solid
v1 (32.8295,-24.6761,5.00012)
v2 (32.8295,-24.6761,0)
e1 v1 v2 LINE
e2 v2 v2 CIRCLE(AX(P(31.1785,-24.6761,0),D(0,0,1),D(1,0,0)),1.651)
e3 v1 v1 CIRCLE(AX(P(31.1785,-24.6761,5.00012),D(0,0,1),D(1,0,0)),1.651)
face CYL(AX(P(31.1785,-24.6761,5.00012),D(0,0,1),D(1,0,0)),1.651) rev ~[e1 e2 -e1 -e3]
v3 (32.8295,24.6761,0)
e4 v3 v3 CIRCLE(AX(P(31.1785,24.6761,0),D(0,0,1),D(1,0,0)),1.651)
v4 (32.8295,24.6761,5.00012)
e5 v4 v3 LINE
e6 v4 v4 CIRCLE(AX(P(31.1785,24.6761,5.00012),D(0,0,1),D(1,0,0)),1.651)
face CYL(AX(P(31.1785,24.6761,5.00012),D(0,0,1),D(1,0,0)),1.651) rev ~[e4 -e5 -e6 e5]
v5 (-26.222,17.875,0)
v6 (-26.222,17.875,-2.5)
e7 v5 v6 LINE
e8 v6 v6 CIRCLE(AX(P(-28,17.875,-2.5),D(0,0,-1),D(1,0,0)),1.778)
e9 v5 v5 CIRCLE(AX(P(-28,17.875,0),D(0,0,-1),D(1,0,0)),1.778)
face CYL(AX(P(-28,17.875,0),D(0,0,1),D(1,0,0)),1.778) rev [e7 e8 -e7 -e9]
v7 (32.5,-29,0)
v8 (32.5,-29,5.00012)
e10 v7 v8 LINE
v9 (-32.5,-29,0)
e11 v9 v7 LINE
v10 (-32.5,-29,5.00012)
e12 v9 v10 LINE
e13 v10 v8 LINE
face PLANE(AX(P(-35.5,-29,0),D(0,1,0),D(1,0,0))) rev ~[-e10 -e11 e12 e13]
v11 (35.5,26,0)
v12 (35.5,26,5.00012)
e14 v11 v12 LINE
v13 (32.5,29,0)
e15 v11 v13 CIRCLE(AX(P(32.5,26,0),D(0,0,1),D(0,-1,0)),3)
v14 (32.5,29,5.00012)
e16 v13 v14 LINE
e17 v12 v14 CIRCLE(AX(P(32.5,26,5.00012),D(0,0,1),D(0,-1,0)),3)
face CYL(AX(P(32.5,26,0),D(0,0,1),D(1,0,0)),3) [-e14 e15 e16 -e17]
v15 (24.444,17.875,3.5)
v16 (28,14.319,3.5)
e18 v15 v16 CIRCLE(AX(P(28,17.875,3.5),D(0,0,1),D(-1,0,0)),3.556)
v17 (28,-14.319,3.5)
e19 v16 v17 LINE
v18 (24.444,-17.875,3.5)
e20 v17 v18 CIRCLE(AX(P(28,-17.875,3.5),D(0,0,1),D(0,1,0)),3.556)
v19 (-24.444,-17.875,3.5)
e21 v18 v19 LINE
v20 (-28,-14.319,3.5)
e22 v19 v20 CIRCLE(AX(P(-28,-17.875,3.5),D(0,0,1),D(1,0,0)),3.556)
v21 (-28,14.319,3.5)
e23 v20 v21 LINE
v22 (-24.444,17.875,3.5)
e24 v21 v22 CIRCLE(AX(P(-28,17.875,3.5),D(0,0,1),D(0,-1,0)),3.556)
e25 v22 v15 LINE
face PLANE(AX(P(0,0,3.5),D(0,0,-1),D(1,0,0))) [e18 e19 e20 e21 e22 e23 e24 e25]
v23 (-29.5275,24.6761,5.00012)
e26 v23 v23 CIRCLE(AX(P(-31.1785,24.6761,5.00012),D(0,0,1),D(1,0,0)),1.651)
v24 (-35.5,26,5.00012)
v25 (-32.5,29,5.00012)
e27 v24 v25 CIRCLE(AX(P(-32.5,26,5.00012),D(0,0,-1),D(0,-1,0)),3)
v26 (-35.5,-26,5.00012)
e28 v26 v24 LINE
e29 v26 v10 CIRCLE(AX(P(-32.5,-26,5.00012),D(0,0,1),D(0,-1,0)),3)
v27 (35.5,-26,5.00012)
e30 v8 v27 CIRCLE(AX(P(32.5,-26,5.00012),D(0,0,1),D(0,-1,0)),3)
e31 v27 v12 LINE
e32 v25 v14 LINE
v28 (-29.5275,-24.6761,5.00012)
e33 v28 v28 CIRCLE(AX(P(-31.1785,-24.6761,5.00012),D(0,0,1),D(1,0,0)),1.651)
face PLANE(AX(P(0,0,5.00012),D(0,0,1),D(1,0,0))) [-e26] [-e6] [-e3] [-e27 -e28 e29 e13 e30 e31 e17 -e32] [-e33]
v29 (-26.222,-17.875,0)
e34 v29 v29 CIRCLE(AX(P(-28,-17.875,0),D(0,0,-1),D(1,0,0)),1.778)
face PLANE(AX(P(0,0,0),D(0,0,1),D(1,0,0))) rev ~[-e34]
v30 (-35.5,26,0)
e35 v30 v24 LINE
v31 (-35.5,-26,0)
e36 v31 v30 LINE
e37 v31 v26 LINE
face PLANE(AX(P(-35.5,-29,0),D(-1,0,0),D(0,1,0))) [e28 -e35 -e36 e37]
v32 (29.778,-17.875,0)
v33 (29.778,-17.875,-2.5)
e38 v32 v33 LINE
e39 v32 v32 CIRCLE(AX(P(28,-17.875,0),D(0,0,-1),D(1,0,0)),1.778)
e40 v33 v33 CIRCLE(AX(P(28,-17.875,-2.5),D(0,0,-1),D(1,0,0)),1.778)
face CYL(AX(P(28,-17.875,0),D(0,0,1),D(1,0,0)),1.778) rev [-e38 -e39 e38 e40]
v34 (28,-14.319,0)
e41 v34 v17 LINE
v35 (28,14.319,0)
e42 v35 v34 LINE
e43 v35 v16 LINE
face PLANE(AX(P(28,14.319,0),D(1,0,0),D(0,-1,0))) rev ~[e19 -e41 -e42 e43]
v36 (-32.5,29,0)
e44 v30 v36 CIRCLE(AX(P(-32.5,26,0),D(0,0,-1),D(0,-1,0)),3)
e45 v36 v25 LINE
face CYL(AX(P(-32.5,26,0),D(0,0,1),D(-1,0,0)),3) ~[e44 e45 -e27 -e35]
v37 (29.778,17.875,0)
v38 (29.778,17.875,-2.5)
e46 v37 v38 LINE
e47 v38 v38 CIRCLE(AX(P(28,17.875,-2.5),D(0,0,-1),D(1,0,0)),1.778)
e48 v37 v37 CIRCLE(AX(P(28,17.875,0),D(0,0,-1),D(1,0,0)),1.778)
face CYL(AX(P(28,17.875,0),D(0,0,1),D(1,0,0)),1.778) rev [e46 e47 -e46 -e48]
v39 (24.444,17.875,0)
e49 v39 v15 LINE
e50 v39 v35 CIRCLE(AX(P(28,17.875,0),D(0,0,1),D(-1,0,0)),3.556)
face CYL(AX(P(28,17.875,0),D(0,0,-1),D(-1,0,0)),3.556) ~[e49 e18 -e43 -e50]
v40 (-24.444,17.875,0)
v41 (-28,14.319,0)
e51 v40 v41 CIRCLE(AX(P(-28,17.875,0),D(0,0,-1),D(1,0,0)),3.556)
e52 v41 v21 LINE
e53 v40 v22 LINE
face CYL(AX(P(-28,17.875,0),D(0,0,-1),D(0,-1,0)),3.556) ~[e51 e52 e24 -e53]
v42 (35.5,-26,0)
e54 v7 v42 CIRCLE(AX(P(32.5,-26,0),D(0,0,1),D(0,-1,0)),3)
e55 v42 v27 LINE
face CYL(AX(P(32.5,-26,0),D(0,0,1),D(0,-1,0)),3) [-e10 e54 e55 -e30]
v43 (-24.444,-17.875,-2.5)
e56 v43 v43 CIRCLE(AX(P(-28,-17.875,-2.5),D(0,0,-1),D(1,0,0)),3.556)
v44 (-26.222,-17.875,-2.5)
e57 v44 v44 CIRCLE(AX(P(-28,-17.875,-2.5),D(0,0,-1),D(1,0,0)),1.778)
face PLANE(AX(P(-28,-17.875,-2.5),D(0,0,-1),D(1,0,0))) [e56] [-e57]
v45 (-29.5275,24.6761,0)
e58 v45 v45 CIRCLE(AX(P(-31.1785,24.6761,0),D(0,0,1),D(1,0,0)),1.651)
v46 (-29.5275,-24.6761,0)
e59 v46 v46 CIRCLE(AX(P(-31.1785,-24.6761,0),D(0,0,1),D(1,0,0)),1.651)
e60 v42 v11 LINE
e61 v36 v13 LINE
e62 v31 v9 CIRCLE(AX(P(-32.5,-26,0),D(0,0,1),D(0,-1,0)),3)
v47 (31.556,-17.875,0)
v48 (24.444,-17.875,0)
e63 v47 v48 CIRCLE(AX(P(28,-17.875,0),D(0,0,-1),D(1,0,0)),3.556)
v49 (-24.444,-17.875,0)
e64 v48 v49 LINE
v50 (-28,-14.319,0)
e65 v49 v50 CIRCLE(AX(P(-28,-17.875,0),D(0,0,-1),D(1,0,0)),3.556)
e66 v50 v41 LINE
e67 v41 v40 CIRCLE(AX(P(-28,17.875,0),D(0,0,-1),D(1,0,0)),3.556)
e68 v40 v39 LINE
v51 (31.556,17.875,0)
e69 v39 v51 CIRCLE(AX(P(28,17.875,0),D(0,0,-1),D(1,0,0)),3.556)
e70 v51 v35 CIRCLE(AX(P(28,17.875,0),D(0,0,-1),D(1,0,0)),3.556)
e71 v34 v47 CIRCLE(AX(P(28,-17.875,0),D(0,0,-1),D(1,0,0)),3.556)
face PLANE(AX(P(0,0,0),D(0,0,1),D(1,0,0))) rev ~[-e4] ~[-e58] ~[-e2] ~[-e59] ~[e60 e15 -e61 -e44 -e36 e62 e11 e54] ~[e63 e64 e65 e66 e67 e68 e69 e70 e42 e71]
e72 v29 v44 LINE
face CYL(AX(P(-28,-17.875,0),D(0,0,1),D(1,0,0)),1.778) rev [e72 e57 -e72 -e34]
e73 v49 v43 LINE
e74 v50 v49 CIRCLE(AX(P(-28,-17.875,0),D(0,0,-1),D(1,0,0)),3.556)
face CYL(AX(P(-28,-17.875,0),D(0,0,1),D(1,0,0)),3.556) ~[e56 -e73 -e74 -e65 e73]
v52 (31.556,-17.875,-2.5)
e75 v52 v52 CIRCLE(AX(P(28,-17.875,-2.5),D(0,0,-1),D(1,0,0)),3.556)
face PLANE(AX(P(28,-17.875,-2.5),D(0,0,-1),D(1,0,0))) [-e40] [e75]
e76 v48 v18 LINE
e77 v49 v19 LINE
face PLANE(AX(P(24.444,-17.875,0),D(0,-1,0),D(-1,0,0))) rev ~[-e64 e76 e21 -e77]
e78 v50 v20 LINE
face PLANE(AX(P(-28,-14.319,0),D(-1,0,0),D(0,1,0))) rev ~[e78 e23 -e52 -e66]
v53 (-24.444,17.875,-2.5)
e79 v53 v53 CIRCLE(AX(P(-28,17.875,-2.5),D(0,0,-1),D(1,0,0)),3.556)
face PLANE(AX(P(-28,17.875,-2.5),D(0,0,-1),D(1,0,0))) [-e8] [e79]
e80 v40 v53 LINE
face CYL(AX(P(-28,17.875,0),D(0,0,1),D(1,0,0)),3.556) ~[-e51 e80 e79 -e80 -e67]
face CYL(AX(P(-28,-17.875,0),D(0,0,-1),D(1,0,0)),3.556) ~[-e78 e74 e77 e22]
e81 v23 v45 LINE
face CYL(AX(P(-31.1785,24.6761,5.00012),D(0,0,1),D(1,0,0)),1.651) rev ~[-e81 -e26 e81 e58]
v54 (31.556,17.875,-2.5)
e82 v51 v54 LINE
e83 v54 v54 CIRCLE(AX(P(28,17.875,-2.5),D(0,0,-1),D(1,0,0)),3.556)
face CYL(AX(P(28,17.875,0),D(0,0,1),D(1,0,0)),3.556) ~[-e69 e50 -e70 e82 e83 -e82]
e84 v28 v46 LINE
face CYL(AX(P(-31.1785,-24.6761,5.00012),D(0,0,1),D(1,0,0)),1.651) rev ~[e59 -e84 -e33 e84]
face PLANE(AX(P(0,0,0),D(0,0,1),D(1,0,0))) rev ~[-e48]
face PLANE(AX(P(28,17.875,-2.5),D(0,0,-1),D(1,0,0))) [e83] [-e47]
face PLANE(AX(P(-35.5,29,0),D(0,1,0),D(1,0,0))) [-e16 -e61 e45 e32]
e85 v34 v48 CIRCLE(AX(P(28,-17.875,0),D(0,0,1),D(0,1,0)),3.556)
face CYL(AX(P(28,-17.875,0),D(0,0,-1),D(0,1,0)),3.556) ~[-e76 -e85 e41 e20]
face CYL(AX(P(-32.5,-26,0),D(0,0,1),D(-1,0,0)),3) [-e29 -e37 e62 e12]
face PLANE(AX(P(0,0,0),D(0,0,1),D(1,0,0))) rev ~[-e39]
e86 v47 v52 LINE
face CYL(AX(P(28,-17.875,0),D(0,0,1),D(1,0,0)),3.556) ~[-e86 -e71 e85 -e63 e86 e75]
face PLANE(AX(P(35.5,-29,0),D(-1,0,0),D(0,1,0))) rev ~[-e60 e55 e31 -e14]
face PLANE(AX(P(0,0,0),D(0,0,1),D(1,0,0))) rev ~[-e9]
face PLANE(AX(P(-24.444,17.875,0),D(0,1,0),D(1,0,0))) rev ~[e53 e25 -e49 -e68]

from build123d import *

# Parameters (mm, degrees)
F0_W     = 71
F0_H     = 58
F1_DEPTH = 5.00012
F2_R     = 3
F3_R     = 1.651
F4_DEPTH = 5.00112
F5_R     = 3.556
F5_R_2   = 1.778
F6_DEPTH = 2.5
F8_DEPTH = 3.5


# Not quite as in the source:
# - after a boolean that leaves OpenCascade's solid faulty, fix() repairs it
# - a feature names something its author has since deleted; it is built from what else it names


with BuildPart() as f1:
    # F0 (on Top) → F1 (new body)
    with BuildSketch(Plane.XY):
        Rectangle(F0_W, F0_H)
    extrude(amount=F1_DEPTH)

    # F2
    f2_edges = [f1.edges().sort_by_distance(p)[0] for p in [
        (-35.5, 29, 2.50006),
        (35.5, 29, 2.50006),
        (35.5, -29, 2.50006),
        (-35.5, -29, 2.50006),
    ]]
    fillet(f2_edges, radius=F2_R)

    # F3 (on face) → F4 (cut, through all)
    with BuildSketch(Plane.XY.offset(5.00012)):
        with Locations((-31.1785, 24.6761)):
            Circle(F3_R)
        with Locations((-31.1785, -24.6761)):
            Circle(F3_R)
        with Locations((31.1785, -24.6761)):
            Circle(F3_R)
        with Locations((31.1785, 24.6761)):
            Circle(F3_R)
    extrude(amount=-F4_DEPTH, mode=Mode.SUBTRACT)

    # F5 (on face) → F6 (join)
    with BuildSketch(Plane(origin=(0, 0, 0), x_dir=(1, 0, 0), z_dir=(0, 0, -1))):
        with Locations((-28, 17.875)):
            Circle(F5_R)
        with Locations((-28, 17.875)):
            Circle(F5_R_2, mode=Mode.SUBTRACT)
        with Locations((28, 17.875)):
            Circle(F5_R)
        with Locations((28, 17.875)):
            Circle(F5_R_2, mode=Mode.SUBTRACT)
        with Locations((28, -17.875)):
            Circle(F5_R)
        with Locations((28, -17.875)):
            Circle(F5_R_2, mode=Mode.SUBTRACT)
        with Locations((-28, -17.875)):
            Circle(F5_R)
        with Locations((-28, -17.875)):
            Circle(F5_R_2, mode=Mode.SUBTRACT)
    extrude(amount=F6_DEPTH)

    # F7 (on face) → F8 (cut)
    with BuildSketch(Plane(origin=(0, 0, 0), x_dir=(1, 0, 0), z_dir=(0, 0, -1))):
        with BuildLine():
            ThreePointArc((28, 14.319), (25.4855282861, 15.3605282861), (24.444, 17.875))
            Line((24.444, 17.875), (-24.444, 17.875))
            ThreePointArc((-24.444, 17.875), (-25.4855282861, 15.3605282861), (-28, 14.319))
            Line((-28, 14.319), (-28, -14.319))
            ThreePointArc((-28, -14.319), (-25.4855282861, -15.3605282861), (-24.444, -17.875))
            Line((-24.444, -17.875), (24.444, -17.875))
            ThreePointArc((24.444, -17.875), (25.4855282861, -15.3605282861), (28, -14.319))
            Line((28, -14.319), (28, 14.319))
        make_face()
    extrude(amount=-F8_DEPTH, mode=Mode.SUBTRACT)

    add(f1.part.fix(), mode=Mode.REPLACE)


solid = f1.part
